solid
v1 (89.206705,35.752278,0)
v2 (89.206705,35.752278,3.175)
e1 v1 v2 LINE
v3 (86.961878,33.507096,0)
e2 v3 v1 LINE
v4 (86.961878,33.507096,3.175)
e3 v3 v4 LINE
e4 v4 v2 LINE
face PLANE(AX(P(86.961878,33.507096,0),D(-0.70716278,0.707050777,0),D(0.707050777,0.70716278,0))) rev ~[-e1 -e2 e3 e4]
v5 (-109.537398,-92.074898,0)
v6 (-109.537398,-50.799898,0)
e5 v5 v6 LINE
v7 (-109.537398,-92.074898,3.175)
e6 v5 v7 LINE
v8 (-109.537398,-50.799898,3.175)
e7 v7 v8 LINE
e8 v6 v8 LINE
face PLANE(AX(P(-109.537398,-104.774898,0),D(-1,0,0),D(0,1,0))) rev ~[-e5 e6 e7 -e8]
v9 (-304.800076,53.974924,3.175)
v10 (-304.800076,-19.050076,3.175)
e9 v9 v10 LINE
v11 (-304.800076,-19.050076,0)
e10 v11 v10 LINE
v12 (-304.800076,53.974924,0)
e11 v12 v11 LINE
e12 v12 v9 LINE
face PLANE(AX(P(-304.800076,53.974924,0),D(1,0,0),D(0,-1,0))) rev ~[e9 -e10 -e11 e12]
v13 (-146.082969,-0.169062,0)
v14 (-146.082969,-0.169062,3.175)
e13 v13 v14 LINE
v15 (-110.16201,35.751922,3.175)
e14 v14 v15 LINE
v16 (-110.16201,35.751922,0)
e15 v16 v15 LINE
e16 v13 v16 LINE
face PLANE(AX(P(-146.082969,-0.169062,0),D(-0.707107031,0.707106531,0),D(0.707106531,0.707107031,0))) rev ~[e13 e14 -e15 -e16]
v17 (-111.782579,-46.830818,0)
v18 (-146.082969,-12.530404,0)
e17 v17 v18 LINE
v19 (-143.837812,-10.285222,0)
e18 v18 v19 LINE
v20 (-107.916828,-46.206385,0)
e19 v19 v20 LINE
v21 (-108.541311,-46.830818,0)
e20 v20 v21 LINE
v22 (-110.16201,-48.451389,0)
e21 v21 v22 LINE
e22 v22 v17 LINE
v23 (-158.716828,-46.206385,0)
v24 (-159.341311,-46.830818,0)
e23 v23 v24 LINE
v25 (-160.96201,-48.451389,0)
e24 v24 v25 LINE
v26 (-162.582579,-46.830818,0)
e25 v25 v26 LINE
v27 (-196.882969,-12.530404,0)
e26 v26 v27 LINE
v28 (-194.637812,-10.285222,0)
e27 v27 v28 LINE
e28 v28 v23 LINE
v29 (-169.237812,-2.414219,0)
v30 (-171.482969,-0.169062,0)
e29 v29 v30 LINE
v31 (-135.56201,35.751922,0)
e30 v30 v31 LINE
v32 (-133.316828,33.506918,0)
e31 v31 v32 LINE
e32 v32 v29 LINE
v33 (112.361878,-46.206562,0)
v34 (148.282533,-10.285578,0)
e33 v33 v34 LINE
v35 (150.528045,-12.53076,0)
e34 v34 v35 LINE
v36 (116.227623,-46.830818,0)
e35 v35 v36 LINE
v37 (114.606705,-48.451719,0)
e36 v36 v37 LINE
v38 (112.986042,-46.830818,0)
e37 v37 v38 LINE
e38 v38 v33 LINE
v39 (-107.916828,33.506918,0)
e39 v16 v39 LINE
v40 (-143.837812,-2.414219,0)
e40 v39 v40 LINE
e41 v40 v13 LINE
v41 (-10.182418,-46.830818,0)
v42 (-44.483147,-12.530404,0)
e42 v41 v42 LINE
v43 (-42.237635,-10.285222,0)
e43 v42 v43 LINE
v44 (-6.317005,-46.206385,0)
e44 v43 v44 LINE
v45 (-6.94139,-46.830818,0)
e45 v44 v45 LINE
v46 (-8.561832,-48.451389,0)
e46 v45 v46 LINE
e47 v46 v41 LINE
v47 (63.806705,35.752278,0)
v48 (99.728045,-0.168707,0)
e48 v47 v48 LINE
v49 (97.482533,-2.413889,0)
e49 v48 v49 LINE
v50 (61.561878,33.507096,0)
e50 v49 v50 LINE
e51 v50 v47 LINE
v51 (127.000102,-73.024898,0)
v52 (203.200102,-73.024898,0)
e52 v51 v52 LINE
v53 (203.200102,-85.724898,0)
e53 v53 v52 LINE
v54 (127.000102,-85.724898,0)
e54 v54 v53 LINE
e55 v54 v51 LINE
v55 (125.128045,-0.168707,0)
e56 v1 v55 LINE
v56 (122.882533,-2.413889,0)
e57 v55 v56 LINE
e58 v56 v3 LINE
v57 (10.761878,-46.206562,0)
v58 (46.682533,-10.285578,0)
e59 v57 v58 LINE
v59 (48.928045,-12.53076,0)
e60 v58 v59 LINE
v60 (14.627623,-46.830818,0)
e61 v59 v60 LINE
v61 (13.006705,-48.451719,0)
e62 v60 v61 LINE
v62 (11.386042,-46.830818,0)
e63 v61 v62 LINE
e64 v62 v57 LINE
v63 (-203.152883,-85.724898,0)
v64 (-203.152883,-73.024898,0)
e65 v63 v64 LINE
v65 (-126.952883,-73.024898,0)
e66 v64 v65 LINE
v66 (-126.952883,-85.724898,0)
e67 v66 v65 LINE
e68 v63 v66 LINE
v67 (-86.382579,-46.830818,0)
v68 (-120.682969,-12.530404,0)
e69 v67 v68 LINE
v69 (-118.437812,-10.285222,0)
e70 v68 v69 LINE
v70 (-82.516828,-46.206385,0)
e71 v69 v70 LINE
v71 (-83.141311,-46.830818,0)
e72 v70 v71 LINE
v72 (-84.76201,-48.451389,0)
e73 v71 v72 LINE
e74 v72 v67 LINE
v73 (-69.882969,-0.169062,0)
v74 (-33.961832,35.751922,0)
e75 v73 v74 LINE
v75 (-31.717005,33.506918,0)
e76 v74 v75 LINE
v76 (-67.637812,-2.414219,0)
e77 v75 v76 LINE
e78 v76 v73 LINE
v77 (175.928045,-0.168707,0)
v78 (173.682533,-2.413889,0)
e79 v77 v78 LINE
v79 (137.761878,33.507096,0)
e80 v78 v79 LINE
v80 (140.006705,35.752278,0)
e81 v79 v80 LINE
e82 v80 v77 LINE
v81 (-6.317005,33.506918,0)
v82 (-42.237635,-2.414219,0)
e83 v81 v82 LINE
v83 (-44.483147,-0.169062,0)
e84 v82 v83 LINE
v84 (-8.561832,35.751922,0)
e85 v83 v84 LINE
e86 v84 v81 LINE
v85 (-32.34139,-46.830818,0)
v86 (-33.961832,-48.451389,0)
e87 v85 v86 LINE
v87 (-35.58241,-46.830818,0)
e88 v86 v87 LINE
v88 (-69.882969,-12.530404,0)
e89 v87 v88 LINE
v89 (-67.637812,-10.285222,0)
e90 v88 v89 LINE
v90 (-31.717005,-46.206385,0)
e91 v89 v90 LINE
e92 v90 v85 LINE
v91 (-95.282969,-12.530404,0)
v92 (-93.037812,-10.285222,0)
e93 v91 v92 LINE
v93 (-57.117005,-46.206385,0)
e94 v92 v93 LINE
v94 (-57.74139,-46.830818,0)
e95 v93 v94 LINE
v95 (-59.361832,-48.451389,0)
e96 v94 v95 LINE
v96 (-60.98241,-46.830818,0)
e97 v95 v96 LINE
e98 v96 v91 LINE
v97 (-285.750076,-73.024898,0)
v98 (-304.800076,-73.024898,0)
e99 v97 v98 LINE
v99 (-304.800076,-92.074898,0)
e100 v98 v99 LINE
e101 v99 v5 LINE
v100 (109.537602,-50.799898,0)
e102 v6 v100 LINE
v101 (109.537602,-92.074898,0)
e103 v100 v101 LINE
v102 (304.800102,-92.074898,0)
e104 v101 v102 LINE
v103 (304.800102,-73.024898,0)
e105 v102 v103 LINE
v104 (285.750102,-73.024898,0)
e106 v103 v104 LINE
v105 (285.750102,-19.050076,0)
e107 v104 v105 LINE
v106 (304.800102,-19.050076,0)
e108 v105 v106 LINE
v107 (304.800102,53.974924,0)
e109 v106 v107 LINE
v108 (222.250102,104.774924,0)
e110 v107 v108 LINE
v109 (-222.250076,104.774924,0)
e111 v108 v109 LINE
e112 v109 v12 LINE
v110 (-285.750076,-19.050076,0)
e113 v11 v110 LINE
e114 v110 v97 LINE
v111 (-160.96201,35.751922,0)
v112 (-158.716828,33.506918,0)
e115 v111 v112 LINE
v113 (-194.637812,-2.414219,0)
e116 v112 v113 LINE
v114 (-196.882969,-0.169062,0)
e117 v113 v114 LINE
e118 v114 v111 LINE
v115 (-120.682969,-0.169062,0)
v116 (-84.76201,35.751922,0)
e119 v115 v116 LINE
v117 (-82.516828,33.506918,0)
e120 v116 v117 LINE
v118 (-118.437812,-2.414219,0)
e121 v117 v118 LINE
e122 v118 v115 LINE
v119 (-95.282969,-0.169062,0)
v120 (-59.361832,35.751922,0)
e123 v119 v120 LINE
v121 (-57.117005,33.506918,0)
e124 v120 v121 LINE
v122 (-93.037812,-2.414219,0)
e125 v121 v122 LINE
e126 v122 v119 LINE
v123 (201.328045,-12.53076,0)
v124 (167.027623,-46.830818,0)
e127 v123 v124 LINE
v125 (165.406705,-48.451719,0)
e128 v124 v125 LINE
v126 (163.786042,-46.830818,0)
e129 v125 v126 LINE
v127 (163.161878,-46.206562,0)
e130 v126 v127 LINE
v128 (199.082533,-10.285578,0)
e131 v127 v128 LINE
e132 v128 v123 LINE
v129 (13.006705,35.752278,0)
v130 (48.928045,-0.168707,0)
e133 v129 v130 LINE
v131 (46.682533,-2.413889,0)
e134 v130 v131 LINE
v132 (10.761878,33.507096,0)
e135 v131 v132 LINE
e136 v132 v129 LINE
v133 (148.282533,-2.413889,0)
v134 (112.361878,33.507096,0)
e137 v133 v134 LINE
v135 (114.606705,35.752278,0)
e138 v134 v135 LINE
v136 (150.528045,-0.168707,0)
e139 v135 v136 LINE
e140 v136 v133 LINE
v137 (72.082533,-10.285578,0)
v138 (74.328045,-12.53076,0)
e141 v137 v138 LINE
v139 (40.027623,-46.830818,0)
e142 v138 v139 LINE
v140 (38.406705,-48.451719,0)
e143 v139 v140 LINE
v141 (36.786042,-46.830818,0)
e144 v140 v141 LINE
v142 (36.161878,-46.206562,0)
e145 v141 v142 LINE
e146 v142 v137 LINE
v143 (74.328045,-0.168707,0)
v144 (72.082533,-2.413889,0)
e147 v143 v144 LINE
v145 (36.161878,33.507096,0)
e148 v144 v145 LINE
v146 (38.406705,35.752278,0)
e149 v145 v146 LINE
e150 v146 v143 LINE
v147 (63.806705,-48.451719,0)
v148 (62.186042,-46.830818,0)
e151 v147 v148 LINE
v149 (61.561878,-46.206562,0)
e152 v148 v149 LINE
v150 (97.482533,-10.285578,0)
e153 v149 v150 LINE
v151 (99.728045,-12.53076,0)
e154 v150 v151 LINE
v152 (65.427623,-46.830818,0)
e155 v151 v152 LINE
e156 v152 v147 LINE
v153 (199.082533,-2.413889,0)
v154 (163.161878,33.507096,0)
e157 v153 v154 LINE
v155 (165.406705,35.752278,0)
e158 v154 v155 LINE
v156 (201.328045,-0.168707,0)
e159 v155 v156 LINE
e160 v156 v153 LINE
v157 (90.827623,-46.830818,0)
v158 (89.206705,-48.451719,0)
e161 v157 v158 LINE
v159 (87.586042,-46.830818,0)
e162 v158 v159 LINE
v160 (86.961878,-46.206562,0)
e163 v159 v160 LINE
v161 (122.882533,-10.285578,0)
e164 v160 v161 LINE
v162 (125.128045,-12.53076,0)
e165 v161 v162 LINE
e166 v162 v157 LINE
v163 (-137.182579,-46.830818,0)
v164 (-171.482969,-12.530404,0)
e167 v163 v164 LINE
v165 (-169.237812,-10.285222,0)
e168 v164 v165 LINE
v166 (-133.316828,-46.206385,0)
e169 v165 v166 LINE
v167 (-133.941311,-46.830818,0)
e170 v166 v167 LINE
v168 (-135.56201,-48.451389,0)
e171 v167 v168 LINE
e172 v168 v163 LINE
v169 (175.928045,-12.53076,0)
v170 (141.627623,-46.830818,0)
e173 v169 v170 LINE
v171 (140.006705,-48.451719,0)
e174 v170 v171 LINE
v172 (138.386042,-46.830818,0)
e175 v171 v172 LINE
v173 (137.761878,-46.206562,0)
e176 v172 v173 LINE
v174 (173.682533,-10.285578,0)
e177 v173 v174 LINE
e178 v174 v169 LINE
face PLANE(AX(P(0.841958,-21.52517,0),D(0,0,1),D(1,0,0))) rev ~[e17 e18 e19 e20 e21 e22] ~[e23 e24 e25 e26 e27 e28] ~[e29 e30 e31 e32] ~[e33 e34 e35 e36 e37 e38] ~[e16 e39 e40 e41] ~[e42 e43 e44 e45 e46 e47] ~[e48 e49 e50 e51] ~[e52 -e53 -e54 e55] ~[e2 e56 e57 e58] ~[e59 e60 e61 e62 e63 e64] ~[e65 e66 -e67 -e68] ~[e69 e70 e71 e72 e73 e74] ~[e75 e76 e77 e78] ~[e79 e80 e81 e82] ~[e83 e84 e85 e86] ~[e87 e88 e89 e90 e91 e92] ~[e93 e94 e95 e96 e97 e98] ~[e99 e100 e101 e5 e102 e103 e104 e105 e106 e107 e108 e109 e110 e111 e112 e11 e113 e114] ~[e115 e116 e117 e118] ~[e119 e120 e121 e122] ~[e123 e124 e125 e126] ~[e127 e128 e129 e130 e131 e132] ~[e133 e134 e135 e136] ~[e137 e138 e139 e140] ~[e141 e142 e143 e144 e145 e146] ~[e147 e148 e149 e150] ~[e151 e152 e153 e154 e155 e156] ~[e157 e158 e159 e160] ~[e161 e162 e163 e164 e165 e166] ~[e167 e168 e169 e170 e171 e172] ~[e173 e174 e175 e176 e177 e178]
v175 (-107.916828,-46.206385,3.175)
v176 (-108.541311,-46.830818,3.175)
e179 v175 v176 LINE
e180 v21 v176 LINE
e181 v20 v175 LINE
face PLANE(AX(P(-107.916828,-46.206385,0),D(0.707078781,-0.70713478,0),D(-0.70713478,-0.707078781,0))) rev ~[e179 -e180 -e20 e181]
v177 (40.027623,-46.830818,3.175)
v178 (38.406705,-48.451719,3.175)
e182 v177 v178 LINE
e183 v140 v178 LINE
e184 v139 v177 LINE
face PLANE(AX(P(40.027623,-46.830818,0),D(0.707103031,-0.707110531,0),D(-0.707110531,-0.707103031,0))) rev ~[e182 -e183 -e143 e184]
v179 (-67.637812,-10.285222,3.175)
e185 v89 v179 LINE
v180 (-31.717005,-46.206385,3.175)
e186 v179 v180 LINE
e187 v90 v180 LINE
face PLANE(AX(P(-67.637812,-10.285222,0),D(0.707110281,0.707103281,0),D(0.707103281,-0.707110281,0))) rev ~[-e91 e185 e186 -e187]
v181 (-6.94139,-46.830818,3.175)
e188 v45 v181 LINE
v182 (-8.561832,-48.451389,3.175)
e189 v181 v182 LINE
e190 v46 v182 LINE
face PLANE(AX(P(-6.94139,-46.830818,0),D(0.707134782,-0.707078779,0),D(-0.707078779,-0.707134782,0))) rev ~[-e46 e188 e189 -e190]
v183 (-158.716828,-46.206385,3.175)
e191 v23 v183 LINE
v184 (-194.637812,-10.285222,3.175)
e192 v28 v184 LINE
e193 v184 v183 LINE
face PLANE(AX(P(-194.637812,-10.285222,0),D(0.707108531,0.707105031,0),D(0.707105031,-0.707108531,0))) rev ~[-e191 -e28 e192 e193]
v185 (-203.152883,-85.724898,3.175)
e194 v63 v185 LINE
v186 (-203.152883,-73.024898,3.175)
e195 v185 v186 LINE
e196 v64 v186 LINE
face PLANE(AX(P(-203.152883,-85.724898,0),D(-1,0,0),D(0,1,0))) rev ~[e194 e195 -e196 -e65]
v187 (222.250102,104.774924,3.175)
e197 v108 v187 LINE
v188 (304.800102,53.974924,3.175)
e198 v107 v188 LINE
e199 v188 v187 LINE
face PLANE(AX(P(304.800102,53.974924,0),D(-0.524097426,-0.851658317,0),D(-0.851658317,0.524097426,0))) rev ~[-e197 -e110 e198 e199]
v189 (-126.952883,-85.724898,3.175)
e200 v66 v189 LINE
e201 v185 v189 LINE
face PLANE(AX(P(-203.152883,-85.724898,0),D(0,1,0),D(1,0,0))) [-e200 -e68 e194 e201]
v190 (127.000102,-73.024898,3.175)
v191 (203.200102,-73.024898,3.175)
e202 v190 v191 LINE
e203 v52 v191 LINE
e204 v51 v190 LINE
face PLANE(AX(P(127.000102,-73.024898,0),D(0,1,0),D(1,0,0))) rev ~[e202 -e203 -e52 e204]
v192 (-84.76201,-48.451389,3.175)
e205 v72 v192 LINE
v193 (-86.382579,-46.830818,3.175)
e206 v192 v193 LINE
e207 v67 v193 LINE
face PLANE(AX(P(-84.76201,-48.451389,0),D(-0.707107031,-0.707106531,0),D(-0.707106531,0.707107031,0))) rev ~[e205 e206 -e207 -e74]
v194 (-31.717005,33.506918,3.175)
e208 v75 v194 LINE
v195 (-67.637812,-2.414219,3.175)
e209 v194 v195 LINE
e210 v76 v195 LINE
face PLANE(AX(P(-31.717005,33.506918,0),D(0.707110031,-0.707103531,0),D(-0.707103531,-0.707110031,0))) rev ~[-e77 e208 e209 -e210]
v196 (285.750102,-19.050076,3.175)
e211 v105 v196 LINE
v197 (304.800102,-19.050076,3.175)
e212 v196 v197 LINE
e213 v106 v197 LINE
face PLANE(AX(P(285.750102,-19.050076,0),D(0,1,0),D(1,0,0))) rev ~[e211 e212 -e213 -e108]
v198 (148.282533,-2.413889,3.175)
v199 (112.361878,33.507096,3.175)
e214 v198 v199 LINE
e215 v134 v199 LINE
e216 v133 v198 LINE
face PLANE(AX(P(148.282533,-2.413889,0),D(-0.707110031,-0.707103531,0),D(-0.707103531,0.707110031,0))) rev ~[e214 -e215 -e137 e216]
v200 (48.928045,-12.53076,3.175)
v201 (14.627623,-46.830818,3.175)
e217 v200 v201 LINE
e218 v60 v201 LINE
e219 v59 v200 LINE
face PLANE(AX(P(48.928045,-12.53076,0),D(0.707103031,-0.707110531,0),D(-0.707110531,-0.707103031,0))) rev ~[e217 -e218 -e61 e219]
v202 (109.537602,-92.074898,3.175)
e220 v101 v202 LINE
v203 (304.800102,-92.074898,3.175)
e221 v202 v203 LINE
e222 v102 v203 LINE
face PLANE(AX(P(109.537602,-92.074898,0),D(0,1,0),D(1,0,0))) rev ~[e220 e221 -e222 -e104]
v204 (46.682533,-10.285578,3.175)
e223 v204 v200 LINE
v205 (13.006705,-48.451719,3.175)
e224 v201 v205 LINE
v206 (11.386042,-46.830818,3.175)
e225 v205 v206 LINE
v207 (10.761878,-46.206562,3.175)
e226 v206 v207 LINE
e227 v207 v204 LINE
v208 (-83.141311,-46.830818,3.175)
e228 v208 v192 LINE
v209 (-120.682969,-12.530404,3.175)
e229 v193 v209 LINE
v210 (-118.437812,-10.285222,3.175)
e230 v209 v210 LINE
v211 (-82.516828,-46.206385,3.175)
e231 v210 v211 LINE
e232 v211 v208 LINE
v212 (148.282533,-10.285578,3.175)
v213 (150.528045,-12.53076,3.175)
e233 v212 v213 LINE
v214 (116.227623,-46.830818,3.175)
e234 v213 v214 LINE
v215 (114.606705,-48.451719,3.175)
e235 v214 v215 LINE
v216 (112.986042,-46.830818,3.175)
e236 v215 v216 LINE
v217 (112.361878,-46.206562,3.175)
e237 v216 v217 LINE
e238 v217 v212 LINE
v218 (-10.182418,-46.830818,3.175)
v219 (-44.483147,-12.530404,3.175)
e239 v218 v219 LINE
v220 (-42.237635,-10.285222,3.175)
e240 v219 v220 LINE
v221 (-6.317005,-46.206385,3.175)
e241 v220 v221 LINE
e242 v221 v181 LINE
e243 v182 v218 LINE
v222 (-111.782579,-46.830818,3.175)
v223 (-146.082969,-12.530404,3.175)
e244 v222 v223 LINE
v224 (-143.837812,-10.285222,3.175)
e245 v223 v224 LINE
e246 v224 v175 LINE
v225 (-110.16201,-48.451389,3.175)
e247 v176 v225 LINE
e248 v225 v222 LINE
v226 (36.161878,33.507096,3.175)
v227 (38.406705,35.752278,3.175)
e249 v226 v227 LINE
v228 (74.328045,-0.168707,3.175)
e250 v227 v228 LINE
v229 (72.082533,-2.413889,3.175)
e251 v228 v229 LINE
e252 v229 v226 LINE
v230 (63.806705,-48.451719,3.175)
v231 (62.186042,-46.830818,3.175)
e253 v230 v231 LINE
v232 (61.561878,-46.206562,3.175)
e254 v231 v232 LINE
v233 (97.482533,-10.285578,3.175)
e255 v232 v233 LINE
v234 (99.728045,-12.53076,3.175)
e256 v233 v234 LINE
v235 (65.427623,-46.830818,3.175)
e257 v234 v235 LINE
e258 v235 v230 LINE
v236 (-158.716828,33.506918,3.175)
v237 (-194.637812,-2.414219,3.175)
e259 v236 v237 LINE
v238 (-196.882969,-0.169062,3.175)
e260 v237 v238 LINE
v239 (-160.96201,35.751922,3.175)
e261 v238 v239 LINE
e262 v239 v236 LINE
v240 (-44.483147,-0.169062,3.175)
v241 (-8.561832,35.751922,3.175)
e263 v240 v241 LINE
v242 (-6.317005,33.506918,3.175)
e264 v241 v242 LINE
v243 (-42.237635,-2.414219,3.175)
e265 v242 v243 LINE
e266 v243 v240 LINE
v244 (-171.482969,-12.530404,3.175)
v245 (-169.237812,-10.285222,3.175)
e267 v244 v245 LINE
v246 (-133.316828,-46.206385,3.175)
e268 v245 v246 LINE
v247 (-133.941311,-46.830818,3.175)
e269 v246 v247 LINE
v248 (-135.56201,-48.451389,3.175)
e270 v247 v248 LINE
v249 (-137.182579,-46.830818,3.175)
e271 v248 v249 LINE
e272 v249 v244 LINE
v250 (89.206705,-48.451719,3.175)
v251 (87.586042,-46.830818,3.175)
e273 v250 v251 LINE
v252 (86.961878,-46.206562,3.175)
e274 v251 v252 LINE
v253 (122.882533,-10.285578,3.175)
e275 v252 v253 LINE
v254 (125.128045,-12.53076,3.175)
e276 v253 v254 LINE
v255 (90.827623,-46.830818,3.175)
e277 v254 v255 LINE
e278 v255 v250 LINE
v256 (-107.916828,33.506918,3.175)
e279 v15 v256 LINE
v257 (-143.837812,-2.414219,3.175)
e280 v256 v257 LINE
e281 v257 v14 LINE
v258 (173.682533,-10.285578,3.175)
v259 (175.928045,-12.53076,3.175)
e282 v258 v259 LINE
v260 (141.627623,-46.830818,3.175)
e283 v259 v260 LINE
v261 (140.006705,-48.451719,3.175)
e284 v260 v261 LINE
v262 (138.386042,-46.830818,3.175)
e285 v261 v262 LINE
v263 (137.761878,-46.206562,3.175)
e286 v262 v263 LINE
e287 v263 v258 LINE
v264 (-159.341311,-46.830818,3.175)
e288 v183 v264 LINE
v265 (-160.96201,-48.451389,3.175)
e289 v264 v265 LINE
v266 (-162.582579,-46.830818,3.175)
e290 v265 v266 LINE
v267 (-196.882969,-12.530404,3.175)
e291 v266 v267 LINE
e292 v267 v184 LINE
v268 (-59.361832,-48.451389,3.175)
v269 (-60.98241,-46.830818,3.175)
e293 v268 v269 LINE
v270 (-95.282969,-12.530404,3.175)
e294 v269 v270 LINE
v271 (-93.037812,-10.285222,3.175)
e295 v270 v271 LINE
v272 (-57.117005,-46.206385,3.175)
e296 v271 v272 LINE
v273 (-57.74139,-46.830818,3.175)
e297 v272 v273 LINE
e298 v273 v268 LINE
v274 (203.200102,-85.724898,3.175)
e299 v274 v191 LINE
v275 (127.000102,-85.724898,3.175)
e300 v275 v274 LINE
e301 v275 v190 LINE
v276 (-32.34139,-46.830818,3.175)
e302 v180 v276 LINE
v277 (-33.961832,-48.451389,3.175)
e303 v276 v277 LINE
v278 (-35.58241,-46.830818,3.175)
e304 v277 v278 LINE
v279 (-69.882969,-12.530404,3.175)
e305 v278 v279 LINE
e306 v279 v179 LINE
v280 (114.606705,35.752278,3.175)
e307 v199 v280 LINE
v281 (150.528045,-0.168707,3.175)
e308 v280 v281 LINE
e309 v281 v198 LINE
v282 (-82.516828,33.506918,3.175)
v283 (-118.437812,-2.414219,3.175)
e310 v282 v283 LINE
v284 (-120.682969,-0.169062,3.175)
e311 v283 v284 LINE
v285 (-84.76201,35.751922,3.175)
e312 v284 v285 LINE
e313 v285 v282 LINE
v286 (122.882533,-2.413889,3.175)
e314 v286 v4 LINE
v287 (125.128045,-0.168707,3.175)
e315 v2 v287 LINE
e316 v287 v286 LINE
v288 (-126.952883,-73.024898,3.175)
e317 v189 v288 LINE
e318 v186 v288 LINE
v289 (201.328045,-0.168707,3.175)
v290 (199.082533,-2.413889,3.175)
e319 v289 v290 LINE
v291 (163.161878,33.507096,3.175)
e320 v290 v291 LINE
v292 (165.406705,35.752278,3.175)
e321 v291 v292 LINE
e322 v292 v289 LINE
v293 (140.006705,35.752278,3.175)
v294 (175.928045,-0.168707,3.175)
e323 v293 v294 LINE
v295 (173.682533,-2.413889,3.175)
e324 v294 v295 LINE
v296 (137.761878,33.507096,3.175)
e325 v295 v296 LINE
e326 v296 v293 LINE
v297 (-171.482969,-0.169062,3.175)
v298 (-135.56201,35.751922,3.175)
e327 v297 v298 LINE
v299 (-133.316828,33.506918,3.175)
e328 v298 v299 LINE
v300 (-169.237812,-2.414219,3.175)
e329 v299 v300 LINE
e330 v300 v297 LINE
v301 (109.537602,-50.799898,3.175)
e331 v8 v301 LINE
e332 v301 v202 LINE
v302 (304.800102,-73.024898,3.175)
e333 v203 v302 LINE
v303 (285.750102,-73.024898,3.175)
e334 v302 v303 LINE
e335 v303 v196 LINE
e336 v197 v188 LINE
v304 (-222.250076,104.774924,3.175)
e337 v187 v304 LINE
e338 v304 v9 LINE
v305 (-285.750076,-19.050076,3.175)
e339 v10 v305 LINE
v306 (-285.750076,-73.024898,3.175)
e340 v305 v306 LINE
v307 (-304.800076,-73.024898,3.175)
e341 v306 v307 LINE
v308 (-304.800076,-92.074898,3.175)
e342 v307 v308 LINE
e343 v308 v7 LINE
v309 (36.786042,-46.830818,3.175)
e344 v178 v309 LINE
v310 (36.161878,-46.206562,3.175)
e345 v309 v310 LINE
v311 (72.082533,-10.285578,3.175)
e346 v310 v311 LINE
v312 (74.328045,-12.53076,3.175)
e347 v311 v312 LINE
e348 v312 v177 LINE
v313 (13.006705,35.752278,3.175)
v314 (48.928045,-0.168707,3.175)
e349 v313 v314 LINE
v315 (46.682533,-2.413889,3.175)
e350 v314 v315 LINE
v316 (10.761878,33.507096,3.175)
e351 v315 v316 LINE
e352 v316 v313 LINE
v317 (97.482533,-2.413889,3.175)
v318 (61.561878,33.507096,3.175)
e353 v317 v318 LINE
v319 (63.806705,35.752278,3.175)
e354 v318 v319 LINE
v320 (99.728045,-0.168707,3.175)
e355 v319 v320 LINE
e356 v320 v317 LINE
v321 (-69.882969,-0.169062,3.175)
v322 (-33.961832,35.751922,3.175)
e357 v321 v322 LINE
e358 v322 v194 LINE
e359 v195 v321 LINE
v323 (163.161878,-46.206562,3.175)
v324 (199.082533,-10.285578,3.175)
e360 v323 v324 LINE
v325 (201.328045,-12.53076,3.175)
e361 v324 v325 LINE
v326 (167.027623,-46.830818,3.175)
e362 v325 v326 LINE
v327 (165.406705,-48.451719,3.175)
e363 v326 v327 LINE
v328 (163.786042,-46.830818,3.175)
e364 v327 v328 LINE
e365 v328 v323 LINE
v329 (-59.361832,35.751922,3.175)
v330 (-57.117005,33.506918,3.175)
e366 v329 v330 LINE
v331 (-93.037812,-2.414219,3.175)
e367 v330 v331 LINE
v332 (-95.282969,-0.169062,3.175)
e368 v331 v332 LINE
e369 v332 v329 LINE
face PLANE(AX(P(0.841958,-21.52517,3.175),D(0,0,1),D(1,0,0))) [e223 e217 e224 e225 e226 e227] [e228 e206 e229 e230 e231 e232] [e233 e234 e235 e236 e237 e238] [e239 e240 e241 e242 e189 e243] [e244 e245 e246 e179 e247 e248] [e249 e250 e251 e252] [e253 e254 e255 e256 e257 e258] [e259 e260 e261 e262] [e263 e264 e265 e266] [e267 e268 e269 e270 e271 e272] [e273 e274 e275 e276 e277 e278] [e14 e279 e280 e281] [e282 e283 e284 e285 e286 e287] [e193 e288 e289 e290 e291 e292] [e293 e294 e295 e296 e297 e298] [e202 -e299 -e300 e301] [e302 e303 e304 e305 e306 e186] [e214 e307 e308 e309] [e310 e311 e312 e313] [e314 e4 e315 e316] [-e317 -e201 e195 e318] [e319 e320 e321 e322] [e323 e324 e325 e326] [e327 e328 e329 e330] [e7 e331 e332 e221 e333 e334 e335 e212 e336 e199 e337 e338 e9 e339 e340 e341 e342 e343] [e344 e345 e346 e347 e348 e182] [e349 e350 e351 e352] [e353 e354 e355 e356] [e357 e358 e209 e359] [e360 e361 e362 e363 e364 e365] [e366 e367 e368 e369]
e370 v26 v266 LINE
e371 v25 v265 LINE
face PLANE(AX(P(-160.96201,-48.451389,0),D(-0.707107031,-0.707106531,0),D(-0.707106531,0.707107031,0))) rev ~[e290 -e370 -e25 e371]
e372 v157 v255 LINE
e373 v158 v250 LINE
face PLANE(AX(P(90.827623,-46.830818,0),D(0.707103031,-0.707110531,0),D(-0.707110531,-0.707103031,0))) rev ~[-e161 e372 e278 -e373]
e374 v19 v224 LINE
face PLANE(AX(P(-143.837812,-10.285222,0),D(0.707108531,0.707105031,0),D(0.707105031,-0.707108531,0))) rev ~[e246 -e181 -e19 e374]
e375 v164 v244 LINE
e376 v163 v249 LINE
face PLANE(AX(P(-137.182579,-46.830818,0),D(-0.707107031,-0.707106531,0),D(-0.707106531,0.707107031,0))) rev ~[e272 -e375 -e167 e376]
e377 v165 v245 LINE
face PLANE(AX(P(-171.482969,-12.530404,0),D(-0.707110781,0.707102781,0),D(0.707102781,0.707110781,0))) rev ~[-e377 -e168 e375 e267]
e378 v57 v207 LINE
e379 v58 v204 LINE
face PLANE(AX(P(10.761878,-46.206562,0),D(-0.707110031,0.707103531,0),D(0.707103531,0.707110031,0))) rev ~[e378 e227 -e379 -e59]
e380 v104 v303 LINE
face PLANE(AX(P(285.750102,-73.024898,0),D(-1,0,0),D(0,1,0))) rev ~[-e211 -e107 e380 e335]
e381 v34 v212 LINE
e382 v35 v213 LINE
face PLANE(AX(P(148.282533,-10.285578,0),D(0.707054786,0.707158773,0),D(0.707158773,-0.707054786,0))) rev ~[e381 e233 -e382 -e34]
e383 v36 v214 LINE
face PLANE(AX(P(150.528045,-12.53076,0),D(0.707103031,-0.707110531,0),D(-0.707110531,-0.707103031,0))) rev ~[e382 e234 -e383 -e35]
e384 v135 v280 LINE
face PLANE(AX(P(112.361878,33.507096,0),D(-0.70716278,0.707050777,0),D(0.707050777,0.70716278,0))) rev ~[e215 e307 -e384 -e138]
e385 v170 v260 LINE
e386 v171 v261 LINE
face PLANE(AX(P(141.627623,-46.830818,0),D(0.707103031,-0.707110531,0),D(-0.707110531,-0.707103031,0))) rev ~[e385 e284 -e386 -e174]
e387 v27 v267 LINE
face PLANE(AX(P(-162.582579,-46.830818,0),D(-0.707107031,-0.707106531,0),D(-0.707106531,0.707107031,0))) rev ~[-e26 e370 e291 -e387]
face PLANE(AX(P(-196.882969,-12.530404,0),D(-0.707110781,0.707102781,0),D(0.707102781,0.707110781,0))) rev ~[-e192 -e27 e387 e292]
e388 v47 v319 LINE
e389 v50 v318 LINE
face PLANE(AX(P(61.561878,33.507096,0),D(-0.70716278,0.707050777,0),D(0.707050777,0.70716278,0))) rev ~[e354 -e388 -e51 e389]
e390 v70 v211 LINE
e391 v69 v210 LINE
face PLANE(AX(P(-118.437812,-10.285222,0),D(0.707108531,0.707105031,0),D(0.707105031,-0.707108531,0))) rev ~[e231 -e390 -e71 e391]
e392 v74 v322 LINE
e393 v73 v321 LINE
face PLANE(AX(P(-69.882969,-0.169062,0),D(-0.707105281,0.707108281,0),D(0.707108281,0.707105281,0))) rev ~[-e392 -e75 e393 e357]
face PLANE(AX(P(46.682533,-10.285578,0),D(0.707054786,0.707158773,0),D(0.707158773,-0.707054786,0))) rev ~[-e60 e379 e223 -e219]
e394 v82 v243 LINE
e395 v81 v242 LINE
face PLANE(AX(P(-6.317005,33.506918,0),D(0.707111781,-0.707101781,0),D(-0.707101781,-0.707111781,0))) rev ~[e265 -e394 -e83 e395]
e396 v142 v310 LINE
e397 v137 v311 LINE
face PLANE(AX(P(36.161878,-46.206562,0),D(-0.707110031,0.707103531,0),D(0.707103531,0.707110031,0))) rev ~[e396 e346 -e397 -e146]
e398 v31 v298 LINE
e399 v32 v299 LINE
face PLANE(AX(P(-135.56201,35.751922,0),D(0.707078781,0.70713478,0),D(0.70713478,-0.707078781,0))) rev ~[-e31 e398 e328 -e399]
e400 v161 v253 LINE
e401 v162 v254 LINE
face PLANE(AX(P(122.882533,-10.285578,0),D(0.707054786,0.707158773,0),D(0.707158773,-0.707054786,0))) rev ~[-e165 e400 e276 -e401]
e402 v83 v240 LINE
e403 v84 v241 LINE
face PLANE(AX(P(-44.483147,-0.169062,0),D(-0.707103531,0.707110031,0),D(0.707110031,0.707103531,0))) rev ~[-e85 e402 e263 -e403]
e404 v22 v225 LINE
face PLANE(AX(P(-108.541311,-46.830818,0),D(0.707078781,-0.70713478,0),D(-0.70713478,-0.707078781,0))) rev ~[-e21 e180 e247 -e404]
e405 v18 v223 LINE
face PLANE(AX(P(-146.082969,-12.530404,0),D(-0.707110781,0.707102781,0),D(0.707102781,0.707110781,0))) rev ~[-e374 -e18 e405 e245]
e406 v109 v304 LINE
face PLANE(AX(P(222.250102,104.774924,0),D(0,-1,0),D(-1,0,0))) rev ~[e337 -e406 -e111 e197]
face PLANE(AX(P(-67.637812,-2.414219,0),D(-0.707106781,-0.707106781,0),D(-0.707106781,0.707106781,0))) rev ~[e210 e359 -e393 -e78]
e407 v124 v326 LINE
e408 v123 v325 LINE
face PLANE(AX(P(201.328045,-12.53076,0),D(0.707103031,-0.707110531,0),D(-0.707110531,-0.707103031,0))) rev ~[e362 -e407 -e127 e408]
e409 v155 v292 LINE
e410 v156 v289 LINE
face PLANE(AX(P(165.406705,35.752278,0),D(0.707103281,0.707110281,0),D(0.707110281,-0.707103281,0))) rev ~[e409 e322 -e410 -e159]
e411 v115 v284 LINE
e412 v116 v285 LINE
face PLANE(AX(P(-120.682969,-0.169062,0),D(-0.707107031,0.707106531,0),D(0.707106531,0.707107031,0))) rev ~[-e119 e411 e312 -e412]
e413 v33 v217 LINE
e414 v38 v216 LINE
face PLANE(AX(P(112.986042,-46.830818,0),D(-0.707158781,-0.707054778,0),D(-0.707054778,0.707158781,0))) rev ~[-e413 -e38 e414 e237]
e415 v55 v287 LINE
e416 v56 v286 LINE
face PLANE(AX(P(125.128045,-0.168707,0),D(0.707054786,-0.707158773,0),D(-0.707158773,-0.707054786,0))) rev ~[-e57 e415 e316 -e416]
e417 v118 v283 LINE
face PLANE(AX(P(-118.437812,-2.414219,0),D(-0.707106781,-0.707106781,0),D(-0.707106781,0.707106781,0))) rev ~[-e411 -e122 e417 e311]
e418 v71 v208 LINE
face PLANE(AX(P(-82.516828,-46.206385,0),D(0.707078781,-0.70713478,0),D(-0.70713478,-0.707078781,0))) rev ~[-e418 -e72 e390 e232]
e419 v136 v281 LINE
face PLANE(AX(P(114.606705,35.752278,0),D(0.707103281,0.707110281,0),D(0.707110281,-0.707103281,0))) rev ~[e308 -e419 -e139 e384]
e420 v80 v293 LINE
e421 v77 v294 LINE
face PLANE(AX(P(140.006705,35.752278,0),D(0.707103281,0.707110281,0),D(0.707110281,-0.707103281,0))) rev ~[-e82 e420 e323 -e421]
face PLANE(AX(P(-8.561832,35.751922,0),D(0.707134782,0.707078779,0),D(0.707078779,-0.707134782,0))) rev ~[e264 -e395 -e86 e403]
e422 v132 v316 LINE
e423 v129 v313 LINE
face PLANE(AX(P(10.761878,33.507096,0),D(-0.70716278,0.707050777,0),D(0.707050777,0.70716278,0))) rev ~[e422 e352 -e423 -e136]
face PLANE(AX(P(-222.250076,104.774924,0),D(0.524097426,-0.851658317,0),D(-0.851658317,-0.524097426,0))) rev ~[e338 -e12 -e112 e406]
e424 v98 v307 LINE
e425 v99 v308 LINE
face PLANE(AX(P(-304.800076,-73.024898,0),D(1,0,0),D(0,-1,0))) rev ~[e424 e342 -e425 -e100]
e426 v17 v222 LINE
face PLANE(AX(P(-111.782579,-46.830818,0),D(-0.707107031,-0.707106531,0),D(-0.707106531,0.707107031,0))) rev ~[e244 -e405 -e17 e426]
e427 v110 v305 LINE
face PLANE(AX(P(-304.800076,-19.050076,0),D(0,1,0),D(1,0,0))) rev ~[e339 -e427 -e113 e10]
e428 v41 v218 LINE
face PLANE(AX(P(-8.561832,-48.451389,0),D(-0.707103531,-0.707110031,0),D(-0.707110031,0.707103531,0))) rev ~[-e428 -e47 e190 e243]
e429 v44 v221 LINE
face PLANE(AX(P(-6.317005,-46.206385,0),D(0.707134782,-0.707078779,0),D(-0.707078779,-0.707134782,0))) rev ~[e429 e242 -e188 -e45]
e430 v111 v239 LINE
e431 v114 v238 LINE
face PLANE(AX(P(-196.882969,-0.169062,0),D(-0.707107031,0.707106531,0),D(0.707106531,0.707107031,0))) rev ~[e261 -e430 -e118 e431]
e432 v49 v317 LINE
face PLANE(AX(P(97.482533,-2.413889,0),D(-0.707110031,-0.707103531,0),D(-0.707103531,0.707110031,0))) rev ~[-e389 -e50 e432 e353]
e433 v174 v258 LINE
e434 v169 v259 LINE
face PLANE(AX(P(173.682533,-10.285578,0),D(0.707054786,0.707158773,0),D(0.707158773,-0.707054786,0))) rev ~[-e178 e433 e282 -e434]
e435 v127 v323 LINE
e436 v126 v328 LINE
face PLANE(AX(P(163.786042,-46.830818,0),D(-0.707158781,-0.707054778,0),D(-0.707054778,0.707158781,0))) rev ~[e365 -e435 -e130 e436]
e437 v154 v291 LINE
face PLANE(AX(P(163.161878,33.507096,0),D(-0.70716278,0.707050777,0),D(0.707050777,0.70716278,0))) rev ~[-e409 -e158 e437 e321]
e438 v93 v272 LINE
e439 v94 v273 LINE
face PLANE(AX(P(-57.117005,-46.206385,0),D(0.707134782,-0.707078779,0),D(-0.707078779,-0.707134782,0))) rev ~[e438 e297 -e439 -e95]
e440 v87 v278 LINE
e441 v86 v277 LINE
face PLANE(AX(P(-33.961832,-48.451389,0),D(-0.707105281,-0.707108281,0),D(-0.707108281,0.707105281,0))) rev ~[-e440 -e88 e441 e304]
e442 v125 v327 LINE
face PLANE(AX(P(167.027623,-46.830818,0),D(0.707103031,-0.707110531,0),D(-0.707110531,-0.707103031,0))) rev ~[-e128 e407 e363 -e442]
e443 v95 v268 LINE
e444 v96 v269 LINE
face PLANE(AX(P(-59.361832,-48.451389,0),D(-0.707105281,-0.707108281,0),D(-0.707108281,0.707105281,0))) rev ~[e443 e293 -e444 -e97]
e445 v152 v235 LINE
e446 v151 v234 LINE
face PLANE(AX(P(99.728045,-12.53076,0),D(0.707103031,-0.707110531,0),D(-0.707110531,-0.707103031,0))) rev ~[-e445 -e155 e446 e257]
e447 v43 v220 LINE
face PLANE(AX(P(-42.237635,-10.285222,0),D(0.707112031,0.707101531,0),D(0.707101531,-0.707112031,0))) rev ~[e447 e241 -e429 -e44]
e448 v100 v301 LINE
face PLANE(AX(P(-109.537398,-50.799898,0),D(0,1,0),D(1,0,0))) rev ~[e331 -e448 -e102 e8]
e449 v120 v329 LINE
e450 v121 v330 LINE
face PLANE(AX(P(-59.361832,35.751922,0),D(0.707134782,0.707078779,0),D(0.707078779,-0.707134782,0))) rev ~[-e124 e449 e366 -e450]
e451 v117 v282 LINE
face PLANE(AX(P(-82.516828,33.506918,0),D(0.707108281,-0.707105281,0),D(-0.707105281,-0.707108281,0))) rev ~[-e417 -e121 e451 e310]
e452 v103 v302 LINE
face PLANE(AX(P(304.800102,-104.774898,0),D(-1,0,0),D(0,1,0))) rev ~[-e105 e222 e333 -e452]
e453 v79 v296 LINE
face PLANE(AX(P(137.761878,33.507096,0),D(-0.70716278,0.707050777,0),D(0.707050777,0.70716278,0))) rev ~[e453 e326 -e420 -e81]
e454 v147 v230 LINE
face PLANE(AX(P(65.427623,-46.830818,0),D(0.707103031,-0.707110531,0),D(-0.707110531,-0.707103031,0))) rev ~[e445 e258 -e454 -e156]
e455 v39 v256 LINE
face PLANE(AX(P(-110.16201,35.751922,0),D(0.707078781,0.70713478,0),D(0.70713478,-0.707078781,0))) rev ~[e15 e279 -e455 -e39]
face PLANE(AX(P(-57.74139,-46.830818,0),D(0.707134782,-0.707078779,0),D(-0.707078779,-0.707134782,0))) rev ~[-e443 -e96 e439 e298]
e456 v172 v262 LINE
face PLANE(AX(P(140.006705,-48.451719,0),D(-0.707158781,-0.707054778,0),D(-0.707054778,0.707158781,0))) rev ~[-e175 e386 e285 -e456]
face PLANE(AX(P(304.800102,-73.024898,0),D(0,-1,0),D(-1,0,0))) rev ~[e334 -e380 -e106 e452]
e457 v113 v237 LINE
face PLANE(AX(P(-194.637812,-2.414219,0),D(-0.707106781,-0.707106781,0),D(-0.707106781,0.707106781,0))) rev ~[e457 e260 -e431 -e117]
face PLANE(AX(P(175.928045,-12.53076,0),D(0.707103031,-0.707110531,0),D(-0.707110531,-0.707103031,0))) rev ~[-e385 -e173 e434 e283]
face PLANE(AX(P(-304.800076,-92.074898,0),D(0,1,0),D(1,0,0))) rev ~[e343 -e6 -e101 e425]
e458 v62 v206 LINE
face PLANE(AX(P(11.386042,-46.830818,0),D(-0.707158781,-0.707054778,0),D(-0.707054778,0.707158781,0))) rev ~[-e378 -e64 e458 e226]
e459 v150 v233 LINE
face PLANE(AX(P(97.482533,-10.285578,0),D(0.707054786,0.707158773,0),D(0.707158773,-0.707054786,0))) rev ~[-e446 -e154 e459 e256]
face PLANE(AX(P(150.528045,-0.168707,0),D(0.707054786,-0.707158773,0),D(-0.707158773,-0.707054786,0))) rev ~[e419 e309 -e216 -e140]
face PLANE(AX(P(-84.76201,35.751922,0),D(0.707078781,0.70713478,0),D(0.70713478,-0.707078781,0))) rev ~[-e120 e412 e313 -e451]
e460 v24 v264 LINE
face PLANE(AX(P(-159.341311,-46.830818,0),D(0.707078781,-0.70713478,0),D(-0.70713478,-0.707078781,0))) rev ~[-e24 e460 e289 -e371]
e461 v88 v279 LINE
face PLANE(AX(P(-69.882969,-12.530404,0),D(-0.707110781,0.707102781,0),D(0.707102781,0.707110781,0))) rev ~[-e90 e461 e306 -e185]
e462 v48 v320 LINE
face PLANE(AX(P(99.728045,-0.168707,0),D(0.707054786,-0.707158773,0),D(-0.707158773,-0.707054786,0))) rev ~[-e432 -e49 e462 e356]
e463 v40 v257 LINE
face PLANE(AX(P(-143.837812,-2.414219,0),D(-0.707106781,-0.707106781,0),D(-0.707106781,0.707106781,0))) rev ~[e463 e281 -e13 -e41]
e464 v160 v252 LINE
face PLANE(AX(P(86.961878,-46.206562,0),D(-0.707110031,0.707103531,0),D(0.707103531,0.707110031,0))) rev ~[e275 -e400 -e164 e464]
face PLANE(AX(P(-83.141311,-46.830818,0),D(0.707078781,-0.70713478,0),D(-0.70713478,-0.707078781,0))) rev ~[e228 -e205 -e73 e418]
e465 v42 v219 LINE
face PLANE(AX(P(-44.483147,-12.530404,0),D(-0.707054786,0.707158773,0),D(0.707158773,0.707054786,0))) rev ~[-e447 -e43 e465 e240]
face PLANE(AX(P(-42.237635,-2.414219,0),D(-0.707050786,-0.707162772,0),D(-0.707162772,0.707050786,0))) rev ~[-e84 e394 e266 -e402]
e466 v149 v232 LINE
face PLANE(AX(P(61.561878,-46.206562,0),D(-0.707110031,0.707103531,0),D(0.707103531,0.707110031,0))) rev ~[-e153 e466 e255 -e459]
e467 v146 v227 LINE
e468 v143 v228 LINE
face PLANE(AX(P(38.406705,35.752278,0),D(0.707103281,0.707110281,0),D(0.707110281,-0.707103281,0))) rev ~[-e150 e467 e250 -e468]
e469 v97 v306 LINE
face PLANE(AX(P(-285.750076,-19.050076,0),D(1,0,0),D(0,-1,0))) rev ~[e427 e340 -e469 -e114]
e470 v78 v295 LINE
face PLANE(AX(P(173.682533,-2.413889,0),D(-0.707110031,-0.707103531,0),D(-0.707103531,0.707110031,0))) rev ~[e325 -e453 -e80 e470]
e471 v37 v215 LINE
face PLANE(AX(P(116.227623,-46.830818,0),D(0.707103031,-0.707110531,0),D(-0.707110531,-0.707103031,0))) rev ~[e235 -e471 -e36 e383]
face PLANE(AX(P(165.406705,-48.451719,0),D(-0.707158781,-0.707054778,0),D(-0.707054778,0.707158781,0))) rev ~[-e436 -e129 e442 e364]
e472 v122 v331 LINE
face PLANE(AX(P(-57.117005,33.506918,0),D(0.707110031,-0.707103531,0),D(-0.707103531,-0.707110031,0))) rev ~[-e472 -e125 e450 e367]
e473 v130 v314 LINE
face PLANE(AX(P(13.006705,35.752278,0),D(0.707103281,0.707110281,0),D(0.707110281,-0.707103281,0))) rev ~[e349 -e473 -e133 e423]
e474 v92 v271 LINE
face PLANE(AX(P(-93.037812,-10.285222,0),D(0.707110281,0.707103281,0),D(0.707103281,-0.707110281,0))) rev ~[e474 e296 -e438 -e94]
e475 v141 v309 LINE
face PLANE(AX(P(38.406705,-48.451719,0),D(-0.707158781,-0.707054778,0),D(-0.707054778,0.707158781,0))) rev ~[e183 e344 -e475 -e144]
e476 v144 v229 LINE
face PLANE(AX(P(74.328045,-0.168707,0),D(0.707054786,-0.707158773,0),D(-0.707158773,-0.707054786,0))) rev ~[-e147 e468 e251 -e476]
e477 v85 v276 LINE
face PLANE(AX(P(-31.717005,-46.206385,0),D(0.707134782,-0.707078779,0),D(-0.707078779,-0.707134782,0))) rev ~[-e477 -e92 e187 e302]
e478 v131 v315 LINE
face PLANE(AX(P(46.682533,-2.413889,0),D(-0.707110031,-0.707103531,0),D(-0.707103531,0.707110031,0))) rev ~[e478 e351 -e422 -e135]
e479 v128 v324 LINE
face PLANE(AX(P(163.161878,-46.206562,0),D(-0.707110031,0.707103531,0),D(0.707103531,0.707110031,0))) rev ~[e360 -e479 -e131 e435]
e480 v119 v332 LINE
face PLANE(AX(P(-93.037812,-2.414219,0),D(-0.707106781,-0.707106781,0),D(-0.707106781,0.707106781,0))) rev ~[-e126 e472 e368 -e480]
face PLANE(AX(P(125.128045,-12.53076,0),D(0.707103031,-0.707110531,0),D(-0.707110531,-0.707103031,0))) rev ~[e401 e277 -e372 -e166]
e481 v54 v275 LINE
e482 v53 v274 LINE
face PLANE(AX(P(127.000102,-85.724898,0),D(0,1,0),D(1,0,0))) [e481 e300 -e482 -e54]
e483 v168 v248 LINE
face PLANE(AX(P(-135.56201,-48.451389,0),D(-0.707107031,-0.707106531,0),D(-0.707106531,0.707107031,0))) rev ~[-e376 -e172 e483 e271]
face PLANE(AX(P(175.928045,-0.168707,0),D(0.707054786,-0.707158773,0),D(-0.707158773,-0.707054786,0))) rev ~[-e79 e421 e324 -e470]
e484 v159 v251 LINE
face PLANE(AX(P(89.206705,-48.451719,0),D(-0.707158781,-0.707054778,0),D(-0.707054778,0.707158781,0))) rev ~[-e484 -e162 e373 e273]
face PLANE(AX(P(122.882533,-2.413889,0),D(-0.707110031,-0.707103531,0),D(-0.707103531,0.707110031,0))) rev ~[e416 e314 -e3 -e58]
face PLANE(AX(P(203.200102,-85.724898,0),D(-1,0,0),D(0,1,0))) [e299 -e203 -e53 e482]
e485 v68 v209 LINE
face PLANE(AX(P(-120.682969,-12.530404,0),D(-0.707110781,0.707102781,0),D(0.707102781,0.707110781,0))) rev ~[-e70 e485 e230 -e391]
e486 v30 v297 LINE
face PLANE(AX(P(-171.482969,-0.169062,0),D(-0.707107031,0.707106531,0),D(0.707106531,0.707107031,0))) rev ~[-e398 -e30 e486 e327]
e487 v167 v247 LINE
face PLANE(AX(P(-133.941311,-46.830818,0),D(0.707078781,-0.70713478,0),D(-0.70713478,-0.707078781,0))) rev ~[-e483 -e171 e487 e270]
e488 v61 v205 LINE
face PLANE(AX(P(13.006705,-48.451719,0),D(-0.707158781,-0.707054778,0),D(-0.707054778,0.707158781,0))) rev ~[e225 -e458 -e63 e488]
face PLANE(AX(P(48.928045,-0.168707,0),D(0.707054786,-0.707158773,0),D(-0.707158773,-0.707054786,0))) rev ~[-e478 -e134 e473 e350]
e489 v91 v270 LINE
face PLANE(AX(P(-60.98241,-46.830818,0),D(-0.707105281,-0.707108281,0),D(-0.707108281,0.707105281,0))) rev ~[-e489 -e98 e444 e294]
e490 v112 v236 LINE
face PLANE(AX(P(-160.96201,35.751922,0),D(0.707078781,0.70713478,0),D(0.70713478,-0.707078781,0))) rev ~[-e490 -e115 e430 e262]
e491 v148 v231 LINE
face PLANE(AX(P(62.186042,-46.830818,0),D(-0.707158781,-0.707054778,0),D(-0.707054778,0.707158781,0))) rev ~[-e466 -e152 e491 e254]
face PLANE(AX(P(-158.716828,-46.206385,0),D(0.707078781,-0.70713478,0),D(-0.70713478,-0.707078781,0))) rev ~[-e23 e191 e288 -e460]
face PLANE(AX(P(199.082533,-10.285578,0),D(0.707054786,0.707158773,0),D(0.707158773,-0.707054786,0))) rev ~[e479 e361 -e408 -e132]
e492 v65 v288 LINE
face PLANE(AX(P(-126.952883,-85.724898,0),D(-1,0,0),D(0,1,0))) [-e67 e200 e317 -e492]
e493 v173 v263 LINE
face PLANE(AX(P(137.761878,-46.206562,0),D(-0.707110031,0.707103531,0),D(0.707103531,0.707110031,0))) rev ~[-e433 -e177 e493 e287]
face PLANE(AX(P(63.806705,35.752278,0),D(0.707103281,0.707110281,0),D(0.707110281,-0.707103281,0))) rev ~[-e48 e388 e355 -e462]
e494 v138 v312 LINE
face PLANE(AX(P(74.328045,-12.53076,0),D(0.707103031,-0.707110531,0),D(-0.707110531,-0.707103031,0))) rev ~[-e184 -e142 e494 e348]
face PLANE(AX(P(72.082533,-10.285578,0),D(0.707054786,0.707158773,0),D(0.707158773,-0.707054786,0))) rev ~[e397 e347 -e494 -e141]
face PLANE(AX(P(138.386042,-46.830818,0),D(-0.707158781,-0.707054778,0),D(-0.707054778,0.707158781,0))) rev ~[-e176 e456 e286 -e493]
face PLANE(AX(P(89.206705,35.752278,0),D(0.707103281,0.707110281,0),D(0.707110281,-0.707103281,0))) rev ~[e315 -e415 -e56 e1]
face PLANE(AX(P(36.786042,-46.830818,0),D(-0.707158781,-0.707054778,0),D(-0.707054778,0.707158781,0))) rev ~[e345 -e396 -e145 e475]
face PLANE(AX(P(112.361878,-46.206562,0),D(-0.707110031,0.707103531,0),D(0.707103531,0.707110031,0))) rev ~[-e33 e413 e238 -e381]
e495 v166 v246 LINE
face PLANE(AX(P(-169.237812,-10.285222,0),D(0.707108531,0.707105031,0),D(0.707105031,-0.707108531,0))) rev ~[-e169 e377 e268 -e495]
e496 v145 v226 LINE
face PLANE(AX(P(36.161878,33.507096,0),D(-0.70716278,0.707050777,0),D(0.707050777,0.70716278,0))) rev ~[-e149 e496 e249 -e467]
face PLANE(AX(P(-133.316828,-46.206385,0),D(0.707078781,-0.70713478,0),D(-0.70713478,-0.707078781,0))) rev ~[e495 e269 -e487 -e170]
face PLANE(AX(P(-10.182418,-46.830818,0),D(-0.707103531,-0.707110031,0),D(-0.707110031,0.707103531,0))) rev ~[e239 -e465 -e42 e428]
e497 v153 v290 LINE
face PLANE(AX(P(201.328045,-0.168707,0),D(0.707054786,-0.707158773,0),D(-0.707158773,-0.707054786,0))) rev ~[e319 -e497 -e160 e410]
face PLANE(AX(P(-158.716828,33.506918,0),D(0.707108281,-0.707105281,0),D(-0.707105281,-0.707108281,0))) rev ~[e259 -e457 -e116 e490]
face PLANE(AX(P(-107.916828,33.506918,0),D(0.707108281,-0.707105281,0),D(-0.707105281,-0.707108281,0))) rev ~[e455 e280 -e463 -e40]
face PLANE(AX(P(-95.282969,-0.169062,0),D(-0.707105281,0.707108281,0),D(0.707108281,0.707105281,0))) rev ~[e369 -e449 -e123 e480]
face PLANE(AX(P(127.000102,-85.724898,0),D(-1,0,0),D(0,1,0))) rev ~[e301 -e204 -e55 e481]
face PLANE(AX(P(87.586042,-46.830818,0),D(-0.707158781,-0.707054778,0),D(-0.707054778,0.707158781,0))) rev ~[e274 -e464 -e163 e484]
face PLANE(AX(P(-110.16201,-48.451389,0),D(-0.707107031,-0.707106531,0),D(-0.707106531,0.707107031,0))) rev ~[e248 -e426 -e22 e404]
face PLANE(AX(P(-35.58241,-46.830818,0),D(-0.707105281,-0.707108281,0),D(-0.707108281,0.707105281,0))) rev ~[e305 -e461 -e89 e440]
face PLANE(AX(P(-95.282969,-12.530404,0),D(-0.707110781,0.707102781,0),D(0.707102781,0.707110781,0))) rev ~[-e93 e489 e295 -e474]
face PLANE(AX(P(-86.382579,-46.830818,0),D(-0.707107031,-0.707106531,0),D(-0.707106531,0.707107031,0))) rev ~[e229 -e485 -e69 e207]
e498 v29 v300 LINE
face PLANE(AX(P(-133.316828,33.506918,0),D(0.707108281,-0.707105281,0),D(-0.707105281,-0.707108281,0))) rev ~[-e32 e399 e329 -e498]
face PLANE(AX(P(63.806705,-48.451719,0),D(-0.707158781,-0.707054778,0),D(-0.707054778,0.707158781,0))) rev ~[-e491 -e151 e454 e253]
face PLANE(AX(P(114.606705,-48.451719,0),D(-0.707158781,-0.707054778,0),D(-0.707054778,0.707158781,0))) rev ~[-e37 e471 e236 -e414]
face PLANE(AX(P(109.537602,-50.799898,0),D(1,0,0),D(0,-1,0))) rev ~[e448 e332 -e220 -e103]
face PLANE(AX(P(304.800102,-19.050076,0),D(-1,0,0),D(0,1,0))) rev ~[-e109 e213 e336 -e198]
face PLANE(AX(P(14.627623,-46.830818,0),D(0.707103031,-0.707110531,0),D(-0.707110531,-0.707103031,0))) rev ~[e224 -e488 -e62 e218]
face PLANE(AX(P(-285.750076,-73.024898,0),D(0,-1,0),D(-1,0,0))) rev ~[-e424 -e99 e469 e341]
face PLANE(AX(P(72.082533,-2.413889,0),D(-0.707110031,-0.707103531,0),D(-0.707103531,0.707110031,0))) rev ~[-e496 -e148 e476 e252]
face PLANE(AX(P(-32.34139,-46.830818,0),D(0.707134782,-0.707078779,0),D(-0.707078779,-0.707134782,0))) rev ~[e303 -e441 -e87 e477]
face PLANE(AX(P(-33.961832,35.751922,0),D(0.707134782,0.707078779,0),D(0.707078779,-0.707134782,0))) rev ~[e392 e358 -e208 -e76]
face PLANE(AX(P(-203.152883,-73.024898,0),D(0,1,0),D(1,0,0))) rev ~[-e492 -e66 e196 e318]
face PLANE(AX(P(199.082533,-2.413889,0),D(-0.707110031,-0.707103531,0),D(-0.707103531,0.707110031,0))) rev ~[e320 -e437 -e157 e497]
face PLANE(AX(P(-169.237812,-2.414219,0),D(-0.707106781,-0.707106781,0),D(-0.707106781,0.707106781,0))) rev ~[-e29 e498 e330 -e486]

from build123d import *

# Parameters (mm, degrees)
F0_W     = 76.2
F0_H     = 12.7
F1_DEPTH = 3.175
F2_DEPTH = 12.7


# Not quite as in the source:
# - a length typed as a fraction of an inch, garbled in the dataset ("3 / 203.2 mm" for 3/8 in), is restored


with BuildPart() as f1:
    # F0 (on Top) → F1 (new body)
    with BuildSketch(Plane.XY):
        Polygon((285.7501016, -19.0500762), (304.8001016, -19.0500762), (304.8001016, 53.9749238), (222.2501016, 104.7749238), (-222.2500762, 104.7749238), (-304.8000762, 53.9749238), (-304.8000762, -19.0500762), (-285.7500762, -19.0500762), (-285.7500762, -73.0248984), (-304.8000762, -73.0248984), (-304.8000762, -104.7748984), (-109.5373984, -104.7748984), (-109.5373984, -67.4683182), (-244.475254, -67.4683182), (-244.475254, -46.8308182), (-162.5825794541, -46.8308182), (-196.8829692, -12.5304042), (-194.6378124, -10.285222), (-158.7168276, -46.2063846), (-159.3413106539, -46.8308182), (-137.1825794541, -46.8308182), (-171.4829692, -12.5304042), (-169.2378124, -10.285222), (-133.3168276, -46.2063846), (-133.9413106539, -46.8308182), (-111.7825794541, -46.8308182), (-146.0829692, -12.5304042), (-143.8378124, -10.285222), (-107.9168276, -46.2063846), (-108.5413106539, -46.8308182), (-86.3825794541, -46.8308182), (-120.6829692, -12.5304042), (-118.4378124, -10.285222), (-82.5168276, -46.2063846), (-83.1413106539, -46.8308182), (-60.9824096755, -46.8308182), (-95.2829692, -12.5304042), (-93.0378124, -10.285222), (-57.1170054, -46.2063846), (-57.7413895461, -46.8308182), (-35.5824096755, -46.8308182), (-69.8829692, -12.5304042), (-67.6378124, -10.285222), (-31.7170054, -46.2063846), (-32.3413895461, -46.8308182), (-10.1824176969, -46.8308182), (-44.483147, -12.5304042), (-42.2376346, -10.285222), (-6.3170054, -46.2063846), (-6.9413895461, -46.8308182), (11.3860423894, -46.8308182), (10.7618784, -46.2065624), (46.682533, -10.2855776), (48.9280454, -12.5307598), (14.6276231923, -46.8308182), (36.7860423894, -46.8308182), (36.1618784, -46.2065624), (72.082533, -10.2855776), (74.3280454, -12.5307598), (40.0276231923, -46.8308182), (62.1860423894, -46.8308182), (61.5618784, -46.2065624), (97.482533, -10.2855776), (99.7280454, -12.5307598), (65.4276231923, -46.8308182), (87.5860423894, -46.8308182), (86.9618784, -46.2065624), (122.882533, -10.2855776), (125.1280454, -12.5307598), (90.8276231923, -46.8308182), (112.9860423894, -46.8308182), (112.3618784, -46.2065624), (148.282533, -10.2855776), (150.5280454, -12.5307598), (116.2276231923, -46.8308182), (138.3860423894, -46.8308182), (137.7618784, -46.2065624), (173.682533, -10.2855776), (175.9280454, -12.5307598), (141.6276231923, -46.8308182), (163.7860423894, -46.8308182), (163.1618784, -46.2065624), (199.082533, -10.2855776), (201.3280454, -12.5307598), (167.0276231923, -46.8308182), (244.474746, -46.8308182), (244.474746, -67.4683182), (109.5376016, -67.4683182), (109.5376016, -104.7748984), (304.8001016, -104.7748984), (304.8001016, -73.0248984), (285.7501016, -73.0248984), align=None)
        with Locations((-165.052883, -79.3748984)):
            Rectangle(F0_W, F0_H, mode=Mode.SUBTRACT)
        with Locations((165.1001016, -79.3748984)):
            Rectangle(F0_W, F0_H, mode=Mode.SUBTRACT)
        Polygon((-158.7168276, 33.506918), (-194.6378124, -2.4142192), (-196.8829692, -0.1690624), (-160.9620098, 35.7519224), align=None, mode=Mode.SUBTRACT)
        Polygon((-133.3168276, 33.506918), (-169.2378124, -2.4142192), (-171.4829692, -0.1690624), (-135.5620098, 35.7519224), align=None, mode=Mode.SUBTRACT)
        Polygon((-107.9168276, 33.506918), (-143.8378124, -2.4142192), (-146.0829692, -0.1690624), (-110.1620098, 35.7519224), align=None, mode=Mode.SUBTRACT)
        Polygon((-82.5168276, 33.506918), (-118.4378124, -2.4142192), (-120.6829692, -0.1690624), (-84.7620098, 35.7519224), align=None, mode=Mode.SUBTRACT)
        Polygon((-57.1170054, 33.506918), (-93.0378124, -2.4142192), (-95.2829692, -0.1690624), (-59.361832, 35.7519224), align=None, mode=Mode.SUBTRACT)
        Polygon((-31.7170054, 33.506918), (-67.6378124, -2.4142192), (-69.8829692, -0.1690624), (-33.961832, 35.7519224), align=None, mode=Mode.SUBTRACT)
        Polygon((-6.3170054, 33.506918), (-42.2376346, -2.4142192), (-44.483147, -0.1690624), (-8.561832, 35.7519224), align=None, mode=Mode.SUBTRACT)
        Polygon((13.006705, 35.752278), (48.9280454, -0.1687068), (46.682533, -2.413889), (10.7618784, 33.5070958), align=None, mode=Mode.SUBTRACT)
        Polygon((38.406705, 35.752278), (74.3280454, -0.1687068), (72.082533, -2.413889), (36.1618784, 33.5070958), align=None, mode=Mode.SUBTRACT)
        Polygon((63.806705, 35.752278), (99.7280454, -0.1687068), (97.482533, -2.413889), (61.5618784, 33.5070958), align=None, mode=Mode.SUBTRACT)
        Polygon((89.206705, 35.752278), (125.1280454, -0.1687068), (122.882533, -2.413889), (86.9618784, 33.5070958), align=None, mode=Mode.SUBTRACT)
        Polygon((114.606705, 35.752278), (150.5280454, -0.1687068), (148.282533, -2.413889), (112.3618784, 33.5070958), align=None, mode=Mode.SUBTRACT)
        Polygon((140.006705, 35.752278), (175.9280454, -0.1687068), (173.682533, -2.413889), (137.7618784, 33.5070958), align=None, mode=Mode.SUBTRACT)
        Polygon((165.406705, 35.752278), (201.3280454, -0.1687068), (199.082533, -2.413889), (163.1618784, 33.5070958), align=None, mode=Mode.SUBTRACT)
        Polygon((109.5376016, -50.7998984), (109.5376016, -67.4683182), (244.474746, -67.4683182), (244.474746, -46.8308182), (167.0276231923, -46.8308182), (165.406705, -48.4517192), (163.7860423894, -46.8308182), (141.6276231923, -46.8308182), (140.006705, -48.4517192), (138.3860423894, -46.8308182), (116.2276231923, -46.8308182), (114.606705, -48.4517192), (112.9860423894, -46.8308182), (90.8276231923, -46.8308182), (89.206705, -48.4517192), (87.5860423894, -46.8308182), (65.4276231923, -46.8308182), (63.806705, -48.4517192), (62.1860423894, -46.8308182), (40.0276231923, -46.8308182), (38.406705, -48.4517192), (36.7860423894, -46.8308182), (14.6276231923, -46.8308182), (13.006705, -48.4517192), (11.3860423894, -46.8308182), (-6.9413895461, -46.8308182), (-8.561832, -48.451389), (-10.1824176969, -46.8308182), (-32.3413895461, -46.8308182), (-33.961832, -48.451389), (-35.5824096755, -46.8308182), (-57.7413895461, -46.8308182), (-59.361832, -48.451389), (-60.9824096755, -46.8308182), (-83.1413106539, -46.8308182), (-84.7620098, -48.451389), (-86.3825794541, -46.8308182), (-108.5413106539, -46.8308182), (-110.1620098, -48.451389), (-111.7825794541, -46.8308182), (-133.9413106539, -46.8308182), (-135.5620098, -48.451389), (-137.1825794541, -46.8308182), (-159.3413106539, -46.8308182), (-160.9620098, -48.451389), (-162.5825794541, -46.8308182), (-244.475254, -46.8308182), (-244.475254, -67.4683182), (-109.5373984, -67.4683182), (-109.5373984, -50.7998984), align=None)
    extrude(amount=F1_DEPTH)

    # F2 (cut): faces of the model
    f2_faces = [f1.faces().sort_by_distance(p)[0] for p in [
        (-207.1687373, -104.7748984, 1.5875),
        (207.1688516, -104.7748984, 1.5875),
    ]]
    extrude(f2_faces, amount=-F2_DEPTH, mode=Mode.SUBTRACT)


solid = f1.part
